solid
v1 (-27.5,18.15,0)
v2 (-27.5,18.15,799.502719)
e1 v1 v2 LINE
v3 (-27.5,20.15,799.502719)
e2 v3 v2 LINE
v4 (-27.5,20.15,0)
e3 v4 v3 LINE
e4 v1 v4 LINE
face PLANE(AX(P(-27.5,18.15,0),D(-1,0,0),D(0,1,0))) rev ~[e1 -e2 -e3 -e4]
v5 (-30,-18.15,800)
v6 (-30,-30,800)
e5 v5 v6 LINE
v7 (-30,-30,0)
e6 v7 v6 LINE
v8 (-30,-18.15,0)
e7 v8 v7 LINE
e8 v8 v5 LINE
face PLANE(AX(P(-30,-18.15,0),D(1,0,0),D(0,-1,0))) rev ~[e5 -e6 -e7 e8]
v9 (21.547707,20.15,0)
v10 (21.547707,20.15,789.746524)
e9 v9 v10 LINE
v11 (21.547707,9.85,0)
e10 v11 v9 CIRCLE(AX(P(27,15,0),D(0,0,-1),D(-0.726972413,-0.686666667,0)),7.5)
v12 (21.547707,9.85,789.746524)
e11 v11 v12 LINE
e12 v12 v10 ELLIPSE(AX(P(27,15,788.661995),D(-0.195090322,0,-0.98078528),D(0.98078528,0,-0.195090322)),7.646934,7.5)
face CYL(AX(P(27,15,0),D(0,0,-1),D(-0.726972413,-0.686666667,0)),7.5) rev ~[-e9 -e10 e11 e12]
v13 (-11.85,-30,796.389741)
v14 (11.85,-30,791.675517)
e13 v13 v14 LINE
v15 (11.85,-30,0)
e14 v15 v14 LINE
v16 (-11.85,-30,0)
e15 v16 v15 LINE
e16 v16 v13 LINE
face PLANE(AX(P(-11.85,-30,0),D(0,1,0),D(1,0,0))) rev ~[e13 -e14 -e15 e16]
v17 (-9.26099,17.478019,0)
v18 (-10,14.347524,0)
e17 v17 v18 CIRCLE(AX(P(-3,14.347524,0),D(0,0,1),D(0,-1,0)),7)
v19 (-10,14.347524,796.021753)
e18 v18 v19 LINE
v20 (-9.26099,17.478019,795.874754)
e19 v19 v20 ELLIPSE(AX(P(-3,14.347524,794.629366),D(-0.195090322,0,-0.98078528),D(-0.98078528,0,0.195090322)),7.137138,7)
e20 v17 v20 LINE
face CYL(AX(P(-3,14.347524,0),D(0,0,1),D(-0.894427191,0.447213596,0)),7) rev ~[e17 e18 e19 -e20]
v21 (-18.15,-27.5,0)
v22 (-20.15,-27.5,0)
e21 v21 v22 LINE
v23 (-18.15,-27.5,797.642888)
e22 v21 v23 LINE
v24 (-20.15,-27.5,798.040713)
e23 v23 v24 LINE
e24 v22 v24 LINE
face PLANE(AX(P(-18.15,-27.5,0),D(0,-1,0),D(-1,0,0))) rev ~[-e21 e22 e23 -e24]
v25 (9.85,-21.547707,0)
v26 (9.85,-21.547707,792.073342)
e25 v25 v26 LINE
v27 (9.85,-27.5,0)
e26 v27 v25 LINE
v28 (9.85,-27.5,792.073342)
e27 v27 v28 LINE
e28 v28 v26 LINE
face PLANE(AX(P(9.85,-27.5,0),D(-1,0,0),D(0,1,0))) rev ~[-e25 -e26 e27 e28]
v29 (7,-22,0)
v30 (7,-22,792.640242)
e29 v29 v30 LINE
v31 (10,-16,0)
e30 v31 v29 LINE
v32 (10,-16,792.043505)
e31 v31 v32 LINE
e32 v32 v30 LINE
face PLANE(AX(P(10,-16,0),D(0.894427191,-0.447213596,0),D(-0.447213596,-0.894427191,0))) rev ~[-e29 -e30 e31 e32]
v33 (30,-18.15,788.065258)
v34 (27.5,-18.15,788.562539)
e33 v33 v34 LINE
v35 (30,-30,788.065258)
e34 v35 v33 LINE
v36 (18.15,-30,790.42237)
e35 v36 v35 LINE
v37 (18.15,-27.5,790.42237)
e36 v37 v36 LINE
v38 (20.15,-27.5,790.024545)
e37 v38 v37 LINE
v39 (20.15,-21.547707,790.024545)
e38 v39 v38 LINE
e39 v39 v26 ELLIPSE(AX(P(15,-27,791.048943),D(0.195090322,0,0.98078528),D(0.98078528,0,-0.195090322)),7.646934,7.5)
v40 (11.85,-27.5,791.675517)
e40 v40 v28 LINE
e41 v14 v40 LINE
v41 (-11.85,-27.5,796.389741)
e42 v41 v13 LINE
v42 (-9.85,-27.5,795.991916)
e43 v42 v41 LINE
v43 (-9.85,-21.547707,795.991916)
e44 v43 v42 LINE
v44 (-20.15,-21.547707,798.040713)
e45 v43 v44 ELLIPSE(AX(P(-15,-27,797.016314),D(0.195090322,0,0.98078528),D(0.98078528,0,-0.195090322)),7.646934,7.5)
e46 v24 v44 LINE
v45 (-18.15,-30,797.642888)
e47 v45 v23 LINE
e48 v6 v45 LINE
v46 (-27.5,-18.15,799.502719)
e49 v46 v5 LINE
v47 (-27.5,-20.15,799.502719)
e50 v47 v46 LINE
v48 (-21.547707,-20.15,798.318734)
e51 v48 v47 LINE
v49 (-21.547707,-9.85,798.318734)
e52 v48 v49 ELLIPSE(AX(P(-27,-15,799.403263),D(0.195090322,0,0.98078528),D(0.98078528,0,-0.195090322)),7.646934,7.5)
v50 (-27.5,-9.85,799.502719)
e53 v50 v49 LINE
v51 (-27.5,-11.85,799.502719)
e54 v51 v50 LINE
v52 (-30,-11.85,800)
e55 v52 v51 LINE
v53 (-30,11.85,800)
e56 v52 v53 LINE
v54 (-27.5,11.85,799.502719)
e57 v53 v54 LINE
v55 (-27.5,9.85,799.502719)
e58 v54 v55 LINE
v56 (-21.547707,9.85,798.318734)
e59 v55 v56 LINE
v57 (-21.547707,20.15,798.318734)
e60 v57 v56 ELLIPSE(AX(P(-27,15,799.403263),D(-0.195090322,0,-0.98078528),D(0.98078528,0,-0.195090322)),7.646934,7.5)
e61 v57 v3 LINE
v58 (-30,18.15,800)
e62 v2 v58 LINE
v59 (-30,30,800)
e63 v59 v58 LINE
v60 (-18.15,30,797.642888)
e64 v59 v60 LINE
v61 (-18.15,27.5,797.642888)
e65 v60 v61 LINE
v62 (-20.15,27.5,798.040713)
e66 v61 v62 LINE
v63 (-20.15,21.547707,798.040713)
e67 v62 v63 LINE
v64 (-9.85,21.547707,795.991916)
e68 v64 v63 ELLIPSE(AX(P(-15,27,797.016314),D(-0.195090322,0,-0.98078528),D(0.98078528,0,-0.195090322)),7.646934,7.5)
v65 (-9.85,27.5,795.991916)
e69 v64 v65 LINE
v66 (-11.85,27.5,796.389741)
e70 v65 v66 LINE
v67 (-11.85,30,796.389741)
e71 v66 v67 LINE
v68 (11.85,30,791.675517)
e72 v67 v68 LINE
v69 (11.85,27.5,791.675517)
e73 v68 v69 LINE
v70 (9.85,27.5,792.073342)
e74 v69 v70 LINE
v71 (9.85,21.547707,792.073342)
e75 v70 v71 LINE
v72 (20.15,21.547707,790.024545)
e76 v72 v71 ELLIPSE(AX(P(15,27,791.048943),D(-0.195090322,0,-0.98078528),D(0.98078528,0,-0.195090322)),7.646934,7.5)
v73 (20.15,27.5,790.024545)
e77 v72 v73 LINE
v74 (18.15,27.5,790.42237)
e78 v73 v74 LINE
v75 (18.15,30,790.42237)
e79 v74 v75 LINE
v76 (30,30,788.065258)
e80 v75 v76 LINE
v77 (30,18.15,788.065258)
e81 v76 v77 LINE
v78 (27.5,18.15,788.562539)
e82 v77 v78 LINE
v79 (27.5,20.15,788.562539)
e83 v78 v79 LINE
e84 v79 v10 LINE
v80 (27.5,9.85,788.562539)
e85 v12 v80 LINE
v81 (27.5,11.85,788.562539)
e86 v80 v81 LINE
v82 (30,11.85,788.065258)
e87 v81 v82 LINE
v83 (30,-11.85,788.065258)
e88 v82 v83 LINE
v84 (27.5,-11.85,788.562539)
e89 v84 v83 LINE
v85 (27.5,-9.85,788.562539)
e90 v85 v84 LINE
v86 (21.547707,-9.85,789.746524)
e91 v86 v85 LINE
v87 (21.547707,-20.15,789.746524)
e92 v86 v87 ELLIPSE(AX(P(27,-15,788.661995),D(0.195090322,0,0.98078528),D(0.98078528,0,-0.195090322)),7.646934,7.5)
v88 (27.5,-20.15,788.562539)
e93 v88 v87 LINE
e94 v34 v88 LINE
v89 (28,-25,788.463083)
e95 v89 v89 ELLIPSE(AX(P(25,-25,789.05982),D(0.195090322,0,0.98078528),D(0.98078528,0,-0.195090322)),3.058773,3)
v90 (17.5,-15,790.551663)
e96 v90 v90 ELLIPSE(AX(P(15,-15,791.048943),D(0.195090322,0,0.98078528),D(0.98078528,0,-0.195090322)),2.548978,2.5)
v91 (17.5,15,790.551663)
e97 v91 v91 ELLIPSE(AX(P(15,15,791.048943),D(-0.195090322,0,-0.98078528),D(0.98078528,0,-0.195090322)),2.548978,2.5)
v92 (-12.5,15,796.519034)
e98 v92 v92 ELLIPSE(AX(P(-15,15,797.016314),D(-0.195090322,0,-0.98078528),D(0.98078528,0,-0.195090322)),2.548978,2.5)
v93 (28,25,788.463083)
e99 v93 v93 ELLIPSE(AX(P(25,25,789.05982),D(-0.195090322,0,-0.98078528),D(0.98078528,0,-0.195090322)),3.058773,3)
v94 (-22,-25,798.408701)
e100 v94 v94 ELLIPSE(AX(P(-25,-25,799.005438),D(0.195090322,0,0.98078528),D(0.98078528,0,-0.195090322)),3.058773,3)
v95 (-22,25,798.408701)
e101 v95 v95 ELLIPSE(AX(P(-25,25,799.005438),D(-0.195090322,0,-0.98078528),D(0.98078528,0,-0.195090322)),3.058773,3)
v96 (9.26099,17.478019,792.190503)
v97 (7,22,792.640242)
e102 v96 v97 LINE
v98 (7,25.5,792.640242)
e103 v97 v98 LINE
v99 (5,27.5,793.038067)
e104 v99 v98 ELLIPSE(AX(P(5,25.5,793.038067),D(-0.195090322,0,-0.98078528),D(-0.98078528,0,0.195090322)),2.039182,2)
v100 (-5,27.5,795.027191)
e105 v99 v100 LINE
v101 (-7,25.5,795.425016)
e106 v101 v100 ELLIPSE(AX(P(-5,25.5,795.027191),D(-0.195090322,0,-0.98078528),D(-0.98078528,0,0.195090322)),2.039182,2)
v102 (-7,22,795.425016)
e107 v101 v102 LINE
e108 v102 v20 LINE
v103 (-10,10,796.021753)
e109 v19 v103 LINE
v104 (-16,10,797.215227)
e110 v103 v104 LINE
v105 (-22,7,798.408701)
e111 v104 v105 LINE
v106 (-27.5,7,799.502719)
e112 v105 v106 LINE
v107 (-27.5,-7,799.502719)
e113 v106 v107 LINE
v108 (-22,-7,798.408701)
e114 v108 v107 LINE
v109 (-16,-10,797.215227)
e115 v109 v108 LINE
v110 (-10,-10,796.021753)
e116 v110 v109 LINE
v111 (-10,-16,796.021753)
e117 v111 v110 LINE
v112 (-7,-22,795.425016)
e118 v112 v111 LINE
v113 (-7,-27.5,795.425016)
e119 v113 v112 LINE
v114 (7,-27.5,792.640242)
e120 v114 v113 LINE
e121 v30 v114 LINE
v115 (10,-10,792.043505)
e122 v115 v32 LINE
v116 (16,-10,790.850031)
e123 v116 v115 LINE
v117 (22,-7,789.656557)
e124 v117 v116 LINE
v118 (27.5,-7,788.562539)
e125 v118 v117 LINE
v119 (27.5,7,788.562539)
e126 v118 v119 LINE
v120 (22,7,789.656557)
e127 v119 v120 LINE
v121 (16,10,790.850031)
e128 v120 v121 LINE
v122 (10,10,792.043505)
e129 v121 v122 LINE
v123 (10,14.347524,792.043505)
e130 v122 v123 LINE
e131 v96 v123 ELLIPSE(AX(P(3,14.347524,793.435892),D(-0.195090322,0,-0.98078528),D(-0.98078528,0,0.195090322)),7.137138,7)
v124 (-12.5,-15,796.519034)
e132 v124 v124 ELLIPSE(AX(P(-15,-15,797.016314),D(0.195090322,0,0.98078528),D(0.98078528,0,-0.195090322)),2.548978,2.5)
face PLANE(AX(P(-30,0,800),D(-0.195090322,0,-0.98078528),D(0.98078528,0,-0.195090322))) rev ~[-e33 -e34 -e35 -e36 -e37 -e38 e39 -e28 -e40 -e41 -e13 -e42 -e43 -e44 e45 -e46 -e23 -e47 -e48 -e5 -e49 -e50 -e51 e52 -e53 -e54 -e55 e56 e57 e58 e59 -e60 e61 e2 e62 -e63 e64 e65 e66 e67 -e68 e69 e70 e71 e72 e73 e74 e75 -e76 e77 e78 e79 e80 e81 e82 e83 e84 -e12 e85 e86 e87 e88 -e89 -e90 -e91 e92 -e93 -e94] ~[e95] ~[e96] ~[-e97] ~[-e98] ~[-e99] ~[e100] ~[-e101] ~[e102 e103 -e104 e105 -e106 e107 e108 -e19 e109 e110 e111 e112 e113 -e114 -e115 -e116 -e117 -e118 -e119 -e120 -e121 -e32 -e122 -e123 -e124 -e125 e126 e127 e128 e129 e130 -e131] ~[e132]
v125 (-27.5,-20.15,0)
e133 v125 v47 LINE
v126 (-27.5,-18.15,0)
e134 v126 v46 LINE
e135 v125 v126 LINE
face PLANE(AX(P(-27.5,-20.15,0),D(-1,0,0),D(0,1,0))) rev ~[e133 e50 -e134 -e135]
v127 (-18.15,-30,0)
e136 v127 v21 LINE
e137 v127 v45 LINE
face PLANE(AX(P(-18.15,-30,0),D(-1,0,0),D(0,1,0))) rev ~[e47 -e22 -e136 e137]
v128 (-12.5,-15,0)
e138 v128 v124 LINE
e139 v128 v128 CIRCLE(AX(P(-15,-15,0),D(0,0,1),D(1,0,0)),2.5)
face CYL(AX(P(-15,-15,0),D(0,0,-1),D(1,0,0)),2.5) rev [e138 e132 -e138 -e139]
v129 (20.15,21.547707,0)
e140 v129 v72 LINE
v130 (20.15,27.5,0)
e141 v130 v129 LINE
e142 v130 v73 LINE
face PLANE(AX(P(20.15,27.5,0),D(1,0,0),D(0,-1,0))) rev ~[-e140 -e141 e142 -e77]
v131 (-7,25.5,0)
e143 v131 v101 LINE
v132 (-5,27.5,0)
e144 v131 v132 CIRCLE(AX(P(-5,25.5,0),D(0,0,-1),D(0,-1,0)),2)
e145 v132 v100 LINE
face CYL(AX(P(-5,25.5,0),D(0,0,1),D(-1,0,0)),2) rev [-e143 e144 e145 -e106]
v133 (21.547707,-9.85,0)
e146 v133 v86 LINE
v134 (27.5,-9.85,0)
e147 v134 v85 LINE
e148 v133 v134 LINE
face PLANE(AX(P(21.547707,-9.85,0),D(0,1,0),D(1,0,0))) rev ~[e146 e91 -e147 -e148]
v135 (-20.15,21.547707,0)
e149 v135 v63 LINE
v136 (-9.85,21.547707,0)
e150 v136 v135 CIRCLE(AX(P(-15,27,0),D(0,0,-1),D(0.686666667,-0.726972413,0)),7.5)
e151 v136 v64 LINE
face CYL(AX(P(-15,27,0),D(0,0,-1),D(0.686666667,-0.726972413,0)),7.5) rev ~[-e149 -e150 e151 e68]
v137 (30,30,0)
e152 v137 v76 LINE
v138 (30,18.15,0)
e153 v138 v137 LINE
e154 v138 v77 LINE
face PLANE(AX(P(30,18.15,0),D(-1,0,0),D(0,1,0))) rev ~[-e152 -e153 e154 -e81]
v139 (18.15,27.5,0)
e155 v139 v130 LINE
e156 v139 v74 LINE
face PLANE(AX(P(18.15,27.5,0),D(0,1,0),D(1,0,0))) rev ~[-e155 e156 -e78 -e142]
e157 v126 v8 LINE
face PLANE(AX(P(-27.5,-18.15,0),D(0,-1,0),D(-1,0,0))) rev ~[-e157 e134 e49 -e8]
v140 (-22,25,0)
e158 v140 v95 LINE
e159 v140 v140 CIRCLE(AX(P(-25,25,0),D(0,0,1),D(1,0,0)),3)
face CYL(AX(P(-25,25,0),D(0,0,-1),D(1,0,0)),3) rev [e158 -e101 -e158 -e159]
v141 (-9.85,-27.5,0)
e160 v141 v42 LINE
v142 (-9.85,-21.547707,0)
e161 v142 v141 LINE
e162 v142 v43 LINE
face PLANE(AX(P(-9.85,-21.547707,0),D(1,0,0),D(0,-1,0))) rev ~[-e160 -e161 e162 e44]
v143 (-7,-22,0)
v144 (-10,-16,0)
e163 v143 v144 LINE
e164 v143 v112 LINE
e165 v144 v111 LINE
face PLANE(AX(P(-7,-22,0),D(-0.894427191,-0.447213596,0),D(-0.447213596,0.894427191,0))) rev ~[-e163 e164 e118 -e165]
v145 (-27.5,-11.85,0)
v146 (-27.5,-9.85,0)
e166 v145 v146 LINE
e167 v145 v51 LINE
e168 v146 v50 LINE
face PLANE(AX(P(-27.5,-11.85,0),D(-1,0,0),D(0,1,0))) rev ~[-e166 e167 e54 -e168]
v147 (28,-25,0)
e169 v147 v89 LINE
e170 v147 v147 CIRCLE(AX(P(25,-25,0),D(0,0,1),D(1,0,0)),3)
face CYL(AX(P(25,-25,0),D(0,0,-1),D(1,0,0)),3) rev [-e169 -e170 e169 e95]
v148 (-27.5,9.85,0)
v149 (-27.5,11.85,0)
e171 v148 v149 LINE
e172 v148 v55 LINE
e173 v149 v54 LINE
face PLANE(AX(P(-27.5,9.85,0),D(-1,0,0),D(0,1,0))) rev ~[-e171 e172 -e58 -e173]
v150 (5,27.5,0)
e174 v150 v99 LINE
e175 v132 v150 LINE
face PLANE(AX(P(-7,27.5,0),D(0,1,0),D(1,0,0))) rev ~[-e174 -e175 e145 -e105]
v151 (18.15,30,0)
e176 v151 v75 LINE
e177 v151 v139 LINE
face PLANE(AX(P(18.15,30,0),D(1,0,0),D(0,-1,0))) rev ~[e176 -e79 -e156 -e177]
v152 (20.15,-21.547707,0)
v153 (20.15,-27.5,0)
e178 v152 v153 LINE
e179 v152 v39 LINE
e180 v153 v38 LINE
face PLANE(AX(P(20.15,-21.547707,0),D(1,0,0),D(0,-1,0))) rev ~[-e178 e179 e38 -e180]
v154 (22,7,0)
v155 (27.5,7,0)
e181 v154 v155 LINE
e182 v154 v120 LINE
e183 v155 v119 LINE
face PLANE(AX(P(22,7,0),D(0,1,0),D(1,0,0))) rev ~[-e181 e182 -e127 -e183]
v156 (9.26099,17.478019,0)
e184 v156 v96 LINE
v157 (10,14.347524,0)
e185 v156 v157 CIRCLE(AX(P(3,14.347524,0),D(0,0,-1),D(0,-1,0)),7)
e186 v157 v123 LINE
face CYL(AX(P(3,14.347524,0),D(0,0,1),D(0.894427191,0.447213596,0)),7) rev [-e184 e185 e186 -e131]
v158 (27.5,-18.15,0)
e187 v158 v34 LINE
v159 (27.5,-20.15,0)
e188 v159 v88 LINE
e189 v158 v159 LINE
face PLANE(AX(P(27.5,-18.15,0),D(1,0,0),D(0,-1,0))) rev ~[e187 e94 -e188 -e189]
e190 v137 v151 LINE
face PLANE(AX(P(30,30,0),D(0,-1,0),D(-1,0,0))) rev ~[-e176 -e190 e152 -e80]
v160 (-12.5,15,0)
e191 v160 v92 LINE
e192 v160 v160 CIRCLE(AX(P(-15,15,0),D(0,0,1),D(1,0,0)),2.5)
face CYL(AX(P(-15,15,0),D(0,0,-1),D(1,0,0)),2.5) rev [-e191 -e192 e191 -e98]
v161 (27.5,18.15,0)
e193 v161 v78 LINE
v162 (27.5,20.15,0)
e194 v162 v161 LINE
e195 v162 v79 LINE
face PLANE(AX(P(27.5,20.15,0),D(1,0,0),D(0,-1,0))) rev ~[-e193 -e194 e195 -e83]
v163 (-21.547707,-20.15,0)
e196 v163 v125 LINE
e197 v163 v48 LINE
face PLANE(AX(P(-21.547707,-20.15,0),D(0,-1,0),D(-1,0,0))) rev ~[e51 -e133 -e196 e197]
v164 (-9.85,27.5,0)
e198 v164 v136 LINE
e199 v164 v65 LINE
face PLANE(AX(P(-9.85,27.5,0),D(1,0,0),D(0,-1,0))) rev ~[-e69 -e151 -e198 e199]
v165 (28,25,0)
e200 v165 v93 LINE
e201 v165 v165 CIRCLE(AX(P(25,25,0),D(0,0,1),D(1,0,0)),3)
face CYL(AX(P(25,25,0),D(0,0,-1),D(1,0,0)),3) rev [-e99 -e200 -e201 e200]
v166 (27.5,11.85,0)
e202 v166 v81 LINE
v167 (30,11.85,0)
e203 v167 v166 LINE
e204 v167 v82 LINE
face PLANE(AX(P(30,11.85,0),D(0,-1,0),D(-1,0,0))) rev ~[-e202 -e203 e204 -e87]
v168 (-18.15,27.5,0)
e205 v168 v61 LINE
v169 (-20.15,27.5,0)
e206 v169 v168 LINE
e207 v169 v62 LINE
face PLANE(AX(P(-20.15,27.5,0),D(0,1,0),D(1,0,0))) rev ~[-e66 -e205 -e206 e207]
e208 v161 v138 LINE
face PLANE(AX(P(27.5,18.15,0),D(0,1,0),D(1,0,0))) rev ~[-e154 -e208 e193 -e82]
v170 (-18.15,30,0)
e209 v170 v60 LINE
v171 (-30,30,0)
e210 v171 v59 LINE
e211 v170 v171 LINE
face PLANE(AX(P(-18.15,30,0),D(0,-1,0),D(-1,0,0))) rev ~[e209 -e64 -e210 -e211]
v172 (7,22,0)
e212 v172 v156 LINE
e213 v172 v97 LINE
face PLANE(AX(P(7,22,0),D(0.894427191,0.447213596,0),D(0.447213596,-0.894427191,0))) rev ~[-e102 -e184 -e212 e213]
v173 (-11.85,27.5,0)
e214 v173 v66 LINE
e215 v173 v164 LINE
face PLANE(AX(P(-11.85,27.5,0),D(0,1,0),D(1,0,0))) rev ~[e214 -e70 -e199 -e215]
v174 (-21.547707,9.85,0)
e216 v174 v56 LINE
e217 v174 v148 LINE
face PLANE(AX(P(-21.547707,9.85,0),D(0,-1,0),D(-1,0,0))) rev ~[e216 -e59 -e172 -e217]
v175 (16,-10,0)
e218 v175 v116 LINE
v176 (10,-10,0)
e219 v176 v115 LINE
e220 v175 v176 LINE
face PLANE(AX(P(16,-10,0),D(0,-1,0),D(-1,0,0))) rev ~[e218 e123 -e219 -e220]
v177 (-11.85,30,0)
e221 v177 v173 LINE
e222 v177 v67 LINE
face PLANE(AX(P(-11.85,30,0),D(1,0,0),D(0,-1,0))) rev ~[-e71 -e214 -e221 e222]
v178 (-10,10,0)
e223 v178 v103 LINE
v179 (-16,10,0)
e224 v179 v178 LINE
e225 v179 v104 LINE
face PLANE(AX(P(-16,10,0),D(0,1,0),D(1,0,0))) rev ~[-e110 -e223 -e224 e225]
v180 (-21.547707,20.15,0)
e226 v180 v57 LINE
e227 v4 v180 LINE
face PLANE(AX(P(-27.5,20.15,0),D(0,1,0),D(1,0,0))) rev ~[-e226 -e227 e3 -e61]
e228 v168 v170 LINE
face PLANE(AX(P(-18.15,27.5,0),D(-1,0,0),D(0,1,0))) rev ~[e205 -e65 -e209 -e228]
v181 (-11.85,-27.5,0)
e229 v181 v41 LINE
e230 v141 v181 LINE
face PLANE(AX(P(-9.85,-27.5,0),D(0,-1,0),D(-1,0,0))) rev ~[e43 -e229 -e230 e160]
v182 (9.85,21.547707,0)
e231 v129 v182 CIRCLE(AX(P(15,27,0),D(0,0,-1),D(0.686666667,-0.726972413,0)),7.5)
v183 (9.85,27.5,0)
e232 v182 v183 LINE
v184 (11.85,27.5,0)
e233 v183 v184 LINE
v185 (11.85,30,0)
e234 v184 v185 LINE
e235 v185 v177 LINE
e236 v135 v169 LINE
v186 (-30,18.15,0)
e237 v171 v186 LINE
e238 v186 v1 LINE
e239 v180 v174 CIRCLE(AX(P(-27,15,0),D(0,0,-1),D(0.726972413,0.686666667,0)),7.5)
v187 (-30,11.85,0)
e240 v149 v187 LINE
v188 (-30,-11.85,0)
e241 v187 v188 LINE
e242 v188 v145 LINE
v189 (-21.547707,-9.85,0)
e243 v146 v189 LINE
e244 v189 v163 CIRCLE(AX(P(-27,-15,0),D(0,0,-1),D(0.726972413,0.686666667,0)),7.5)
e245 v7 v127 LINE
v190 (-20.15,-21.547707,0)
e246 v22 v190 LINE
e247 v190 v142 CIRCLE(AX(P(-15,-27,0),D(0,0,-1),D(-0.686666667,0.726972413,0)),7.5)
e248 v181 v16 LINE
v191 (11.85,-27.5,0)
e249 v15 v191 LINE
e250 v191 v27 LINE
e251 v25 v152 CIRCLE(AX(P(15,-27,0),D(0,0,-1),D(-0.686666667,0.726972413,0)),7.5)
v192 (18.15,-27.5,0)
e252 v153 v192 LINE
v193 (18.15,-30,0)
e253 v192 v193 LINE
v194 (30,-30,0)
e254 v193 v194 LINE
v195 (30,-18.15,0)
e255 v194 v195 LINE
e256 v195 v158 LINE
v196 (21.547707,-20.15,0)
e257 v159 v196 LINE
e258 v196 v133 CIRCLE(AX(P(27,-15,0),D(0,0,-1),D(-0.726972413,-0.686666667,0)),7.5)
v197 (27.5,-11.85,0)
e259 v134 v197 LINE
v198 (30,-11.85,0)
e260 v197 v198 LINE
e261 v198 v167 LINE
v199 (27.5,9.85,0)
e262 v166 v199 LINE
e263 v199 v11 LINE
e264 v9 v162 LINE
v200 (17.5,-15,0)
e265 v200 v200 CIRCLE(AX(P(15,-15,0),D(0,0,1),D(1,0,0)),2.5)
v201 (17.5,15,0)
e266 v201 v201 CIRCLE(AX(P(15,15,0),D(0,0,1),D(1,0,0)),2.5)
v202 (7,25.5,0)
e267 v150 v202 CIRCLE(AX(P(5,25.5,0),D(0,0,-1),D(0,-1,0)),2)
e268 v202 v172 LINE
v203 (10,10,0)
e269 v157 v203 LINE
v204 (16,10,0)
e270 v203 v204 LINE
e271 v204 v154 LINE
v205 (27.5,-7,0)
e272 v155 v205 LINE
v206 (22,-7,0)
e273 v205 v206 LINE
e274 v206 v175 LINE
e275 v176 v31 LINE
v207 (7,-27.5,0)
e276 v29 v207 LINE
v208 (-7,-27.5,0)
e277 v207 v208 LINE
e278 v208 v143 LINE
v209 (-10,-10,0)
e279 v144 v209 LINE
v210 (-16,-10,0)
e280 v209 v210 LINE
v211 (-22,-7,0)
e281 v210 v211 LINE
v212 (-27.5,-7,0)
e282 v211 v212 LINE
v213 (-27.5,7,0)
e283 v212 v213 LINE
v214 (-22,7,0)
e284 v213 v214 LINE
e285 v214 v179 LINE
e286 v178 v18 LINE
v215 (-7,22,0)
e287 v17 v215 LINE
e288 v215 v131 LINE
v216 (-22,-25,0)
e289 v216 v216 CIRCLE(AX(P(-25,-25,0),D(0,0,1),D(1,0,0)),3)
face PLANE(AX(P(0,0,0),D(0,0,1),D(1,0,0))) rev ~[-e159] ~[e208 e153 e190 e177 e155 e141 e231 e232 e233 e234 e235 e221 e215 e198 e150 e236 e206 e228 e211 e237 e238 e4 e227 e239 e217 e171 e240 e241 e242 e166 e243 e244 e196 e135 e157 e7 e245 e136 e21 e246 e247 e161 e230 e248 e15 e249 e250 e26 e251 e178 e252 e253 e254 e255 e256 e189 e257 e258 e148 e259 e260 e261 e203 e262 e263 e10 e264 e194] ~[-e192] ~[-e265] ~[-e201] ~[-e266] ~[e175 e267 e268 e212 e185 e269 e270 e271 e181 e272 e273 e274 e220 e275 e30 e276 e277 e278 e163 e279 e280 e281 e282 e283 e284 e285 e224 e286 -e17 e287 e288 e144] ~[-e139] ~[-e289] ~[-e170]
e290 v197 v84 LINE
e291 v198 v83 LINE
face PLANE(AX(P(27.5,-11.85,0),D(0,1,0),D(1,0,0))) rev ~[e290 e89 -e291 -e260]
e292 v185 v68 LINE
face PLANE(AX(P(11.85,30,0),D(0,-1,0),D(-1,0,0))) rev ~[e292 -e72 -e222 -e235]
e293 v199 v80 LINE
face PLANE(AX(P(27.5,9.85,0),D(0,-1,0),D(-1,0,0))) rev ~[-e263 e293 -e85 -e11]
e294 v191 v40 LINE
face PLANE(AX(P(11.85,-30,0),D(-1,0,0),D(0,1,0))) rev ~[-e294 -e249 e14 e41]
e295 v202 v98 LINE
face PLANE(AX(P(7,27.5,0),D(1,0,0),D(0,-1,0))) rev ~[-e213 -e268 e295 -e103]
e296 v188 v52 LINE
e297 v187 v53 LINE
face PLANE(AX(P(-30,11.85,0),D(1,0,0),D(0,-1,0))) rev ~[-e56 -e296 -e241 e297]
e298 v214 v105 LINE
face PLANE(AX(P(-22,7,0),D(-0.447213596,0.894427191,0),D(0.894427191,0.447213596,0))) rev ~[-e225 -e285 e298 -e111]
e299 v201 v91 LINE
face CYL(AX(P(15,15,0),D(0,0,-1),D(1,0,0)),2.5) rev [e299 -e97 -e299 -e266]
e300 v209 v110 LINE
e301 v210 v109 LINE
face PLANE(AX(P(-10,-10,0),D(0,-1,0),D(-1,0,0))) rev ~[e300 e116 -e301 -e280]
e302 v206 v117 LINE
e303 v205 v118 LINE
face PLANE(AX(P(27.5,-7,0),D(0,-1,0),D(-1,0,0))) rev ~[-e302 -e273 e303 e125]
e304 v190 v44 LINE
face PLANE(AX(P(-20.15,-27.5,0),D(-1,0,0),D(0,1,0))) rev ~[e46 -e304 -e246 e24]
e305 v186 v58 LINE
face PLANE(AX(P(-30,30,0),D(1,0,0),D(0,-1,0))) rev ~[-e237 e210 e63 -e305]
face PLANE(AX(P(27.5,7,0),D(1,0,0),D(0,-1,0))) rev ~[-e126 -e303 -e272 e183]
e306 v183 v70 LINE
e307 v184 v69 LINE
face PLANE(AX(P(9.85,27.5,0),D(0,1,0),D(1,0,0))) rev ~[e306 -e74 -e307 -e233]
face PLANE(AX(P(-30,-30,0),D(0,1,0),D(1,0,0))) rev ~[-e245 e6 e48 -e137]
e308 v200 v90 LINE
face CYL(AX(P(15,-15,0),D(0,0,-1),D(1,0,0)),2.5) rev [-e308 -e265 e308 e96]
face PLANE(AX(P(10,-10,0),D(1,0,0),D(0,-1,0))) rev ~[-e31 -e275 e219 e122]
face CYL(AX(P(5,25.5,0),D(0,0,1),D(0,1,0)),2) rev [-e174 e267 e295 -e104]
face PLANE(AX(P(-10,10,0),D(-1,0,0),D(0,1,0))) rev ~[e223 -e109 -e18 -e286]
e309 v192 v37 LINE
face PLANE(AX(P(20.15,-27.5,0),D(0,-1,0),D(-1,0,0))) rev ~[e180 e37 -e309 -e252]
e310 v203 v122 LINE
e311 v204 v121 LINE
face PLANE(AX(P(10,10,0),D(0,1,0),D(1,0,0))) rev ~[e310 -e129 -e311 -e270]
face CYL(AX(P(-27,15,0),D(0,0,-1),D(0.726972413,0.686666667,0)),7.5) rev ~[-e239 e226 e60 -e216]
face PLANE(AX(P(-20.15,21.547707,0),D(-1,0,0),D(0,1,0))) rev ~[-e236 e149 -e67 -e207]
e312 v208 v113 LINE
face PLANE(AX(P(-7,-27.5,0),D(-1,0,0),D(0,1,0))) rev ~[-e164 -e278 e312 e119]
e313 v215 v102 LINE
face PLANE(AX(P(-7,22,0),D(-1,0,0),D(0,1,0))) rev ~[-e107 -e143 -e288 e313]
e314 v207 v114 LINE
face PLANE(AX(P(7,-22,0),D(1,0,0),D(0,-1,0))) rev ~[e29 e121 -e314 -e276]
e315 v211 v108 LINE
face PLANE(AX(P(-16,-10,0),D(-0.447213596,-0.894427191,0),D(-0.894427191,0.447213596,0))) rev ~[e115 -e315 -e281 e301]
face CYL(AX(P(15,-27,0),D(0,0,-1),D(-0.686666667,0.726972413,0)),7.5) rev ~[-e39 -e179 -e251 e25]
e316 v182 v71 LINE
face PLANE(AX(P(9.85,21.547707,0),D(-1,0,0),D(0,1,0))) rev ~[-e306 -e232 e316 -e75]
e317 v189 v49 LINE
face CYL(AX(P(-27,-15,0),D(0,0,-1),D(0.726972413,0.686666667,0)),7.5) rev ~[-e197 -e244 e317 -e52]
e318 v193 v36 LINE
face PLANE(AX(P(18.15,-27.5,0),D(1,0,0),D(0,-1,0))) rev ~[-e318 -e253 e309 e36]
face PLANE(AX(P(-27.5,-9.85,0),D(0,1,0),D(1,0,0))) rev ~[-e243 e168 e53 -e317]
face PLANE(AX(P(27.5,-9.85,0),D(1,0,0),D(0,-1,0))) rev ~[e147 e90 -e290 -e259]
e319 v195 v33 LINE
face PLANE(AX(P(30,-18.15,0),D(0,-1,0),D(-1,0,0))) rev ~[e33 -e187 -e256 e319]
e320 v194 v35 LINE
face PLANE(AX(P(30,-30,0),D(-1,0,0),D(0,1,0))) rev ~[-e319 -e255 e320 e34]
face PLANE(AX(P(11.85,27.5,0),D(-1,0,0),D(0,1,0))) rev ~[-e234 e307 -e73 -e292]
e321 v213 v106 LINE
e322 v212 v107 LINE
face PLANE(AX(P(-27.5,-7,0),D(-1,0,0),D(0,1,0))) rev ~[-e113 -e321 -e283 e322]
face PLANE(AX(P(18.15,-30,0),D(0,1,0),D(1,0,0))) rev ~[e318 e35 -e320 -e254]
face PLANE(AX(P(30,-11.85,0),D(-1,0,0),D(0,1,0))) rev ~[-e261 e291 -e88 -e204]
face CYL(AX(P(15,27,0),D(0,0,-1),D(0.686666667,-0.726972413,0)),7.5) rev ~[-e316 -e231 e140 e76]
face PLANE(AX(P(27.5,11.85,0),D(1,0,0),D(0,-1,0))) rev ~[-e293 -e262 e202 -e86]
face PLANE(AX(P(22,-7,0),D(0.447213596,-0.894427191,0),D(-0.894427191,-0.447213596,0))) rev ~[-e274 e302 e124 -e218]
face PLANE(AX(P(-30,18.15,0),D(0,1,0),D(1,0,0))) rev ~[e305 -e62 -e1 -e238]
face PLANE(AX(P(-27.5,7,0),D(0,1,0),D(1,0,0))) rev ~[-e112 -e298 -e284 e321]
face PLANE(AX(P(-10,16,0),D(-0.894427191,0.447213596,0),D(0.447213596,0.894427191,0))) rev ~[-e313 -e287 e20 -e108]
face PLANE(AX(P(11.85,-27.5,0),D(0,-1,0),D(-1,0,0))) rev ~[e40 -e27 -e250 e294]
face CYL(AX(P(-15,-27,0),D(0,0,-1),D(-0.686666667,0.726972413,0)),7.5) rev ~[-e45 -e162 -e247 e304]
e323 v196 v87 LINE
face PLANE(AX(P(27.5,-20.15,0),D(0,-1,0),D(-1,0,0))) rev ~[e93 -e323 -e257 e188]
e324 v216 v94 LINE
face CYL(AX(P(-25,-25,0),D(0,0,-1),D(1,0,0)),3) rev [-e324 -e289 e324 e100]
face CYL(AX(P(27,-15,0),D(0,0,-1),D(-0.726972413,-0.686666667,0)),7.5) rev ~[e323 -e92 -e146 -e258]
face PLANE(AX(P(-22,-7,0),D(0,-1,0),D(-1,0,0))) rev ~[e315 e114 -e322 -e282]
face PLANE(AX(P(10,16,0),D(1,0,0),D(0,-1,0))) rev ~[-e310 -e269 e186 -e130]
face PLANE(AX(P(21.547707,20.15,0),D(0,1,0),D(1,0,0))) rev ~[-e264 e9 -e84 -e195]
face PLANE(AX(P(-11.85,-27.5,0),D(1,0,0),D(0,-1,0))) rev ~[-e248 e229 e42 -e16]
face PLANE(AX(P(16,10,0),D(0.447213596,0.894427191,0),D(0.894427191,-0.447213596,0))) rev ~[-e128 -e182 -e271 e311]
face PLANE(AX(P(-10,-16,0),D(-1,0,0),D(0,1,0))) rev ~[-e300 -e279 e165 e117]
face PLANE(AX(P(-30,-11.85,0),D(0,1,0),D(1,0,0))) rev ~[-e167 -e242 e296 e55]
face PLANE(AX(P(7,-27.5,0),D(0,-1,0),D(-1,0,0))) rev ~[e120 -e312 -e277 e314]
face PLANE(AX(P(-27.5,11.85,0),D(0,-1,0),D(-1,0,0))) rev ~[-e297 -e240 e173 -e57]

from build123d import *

# Parameters (mm, degrees)
F0_R          = 3
F0_R_2        = 2.5
F1_DEPTH      = 800
F2_R          = 2
F3_R          = 7
F6_DEPTH      = 30
F6_DEPTH_BACK = 30


# Not quite as in the source:
# - a feature names something its author has since deleted; it is built from what else it names


with BuildPart() as f1:
    # F0 (on Top) → F1 (new body)
    with BuildSketch(Plane.XY):
        with BuildLine():
            Line((18.15, -30), (30, -30))
            Line((30, -30), (30, -18.15))
            Line((30, -18.15), (27.5, -18.15))
            Line((27.5, -18.15), (27.5, -20.15))
            Line((27.5, -20.15), (21.5477069044, -20.15))
            ThreePointArc((21.5477069044, -20.15), (19.5, -15), (21.5477069044, -9.85))
            Line((21.5477069044, -9.85), (27.5, -9.85))
            Line((27.5, -9.85), (27.5, -11.85))
            Line((27.5, -11.85), (30, -11.85))
            Line((30, -11.85), (30, 11.85))
            Line((30, 11.85), (27.5, 11.85))
            Line((27.5, 11.85), (27.5, 9.85))
            Line((27.5, 9.85), (21.5477069044, 9.85))
            ThreePointArc((21.5477069044, 9.85), (19.5, 15), (21.5477069044, 20.15))
            Line((21.5477069044, 20.15), (27.5, 20.15))
            Line((27.5, 20.15), (27.5, 18.15))
            Line((27.5, 18.15), (30, 18.15))
            Line((30, 18.15), (30, 30))
            Line((30, 30), (18.15, 30))
            Line((18.15, 30), (18.15, 27.5))
            Line((18.15, 27.5), (20.15, 27.5))
            Line((20.15, 27.5), (20.15, 21.5477069044))
            ThreePointArc((20.15, 21.5477069044), (15, 19.5), (9.85, 21.5477069044))
            Line((9.85, 21.5477069044), (9.85, 27.5))
            Line((9.85, 27.5), (11.85, 27.5))
            Line((11.85, 27.5), (11.85, 30))
            Line((11.85, 30), (-11.85, 30))
            Line((-11.85, 30), (-11.85, 27.5))
            Line((-11.85, 27.5), (-9.85, 27.5))
            Line((-9.85, 27.5), (-9.85, 21.5477069044))
            ThreePointArc((-9.85, 21.5477069044), (-15, 19.5), (-20.15, 21.5477069044))
            Line((-20.15, 21.5477069044), (-20.15, 27.5))
            Line((-20.15, 27.5), (-18.15, 27.5))
            Line((-18.15, 27.5), (-18.15, 30))
            Line((-18.15, 30), (-30, 30))
            Line((-30, 30), (-30, 18.15))
            Line((-30, 18.15), (-27.5, 18.15))
            Line((-27.5, 18.15), (-27.5, 20.15))
            Line((-27.5, 20.15), (-21.5477069044, 20.15))
            ThreePointArc((-21.5477069044, 20.15), (-19.5, 15), (-21.5477069044, 9.85))
            Line((-21.5477069044, 9.85), (-27.5, 9.85))
            Line((-27.5, 9.85), (-27.5, 11.85))
            Line((-27.5, 11.85), (-30, 11.85))
            Line((-30, 11.85), (-30, -11.85))
            Line((-30, -11.85), (-27.5, -11.85))
            Line((-27.5, -11.85), (-27.5, -9.85))
            Line((-27.5, -9.85), (-21.5477069044, -9.85))
            ThreePointArc((-21.5477069044, -9.85), (-19.5, -15), (-21.5477069044, -20.15))
            Line((-21.5477069044, -20.15), (-27.5, -20.15))
            Line((-27.5, -20.15), (-27.5, -18.15))
            Line((-27.5, -18.15), (-30, -18.15))
            Line((-30, -18.15), (-30, -30))
            Line((-30, -30), (-18.15, -30))
            Line((-18.15, -30), (-18.15, -27.5))
            Line((-18.15, -27.5), (-20.15, -27.5))
            Line((-20.15, -27.5), (-20.15, -21.5477069044))
            ThreePointArc((-20.15, -21.5477069044), (-15, -19.5), (-9.85, -21.5477069044))
            Line((-9.85, -21.5477069044), (-9.85, -27.5))
            Line((-9.85, -27.5), (-11.85, -27.5))
            Line((-11.85, -27.5), (-11.85, -30))
            Line((-11.85, -30), (11.85, -30))
            Line((11.85, -30), (11.85, -27.5))
            Line((11.85, -27.5), (9.85, -27.5))
            Line((9.85, -27.5), (9.85, -21.5477069044))
            ThreePointArc((9.85, -21.5477069044), (15, -19.5), (20.15, -21.5477069044))
            Line((20.15, -21.5477069044), (20.15, -27.5))
            Line((20.15, -27.5), (18.15, -27.5))
            Line((18.15, -27.5), (18.15, -30))
        make_face()
        with Locations((-25, -25)):
            Circle(F0_R, mode=Mode.SUBTRACT)
        with Locations((-15, -15)):
            Circle(F0_R_2, mode=Mode.SUBTRACT)
        with Locations((25, -25)):
            Circle(F0_R, mode=Mode.SUBTRACT)
        with Locations((15, -15)):
            Circle(F0_R_2, mode=Mode.SUBTRACT)
        with Locations((-25, 25)):
            Circle(F0_R, mode=Mode.SUBTRACT)
        with Locations((-15, 15)):
            Circle(F0_R_2, mode=Mode.SUBTRACT)
        Polygon((-7, 22), (-7, 27.5), (0, 27.5), (7, 27.5), (7, 22), (10, 16), (10, 10), (16, 10), (22, 7), (27.5, 7), (27.5, 0), (27.5, -7), (22, -7), (16, -10), (10, -10), (10, -16), (7, -22), (7, -27.5), (0, -27.5), (-7, -27.5), (-7, -22), (-10, -16), (-10, -10), (-16, -10), (-22, -7), (-27.5, -7), (-27.5, 0), (-27.5, 7), (-22, 7), (-16, 10), (-10, 10), (-10, 16), align=None, mode=Mode.SUBTRACT)
        with Locations((15, 15)):
            Circle(F0_R_2, mode=Mode.SUBTRACT)
        with Locations((25, 25)):
            Circle(F0_R, mode=Mode.SUBTRACT)
    extrude(amount=F1_DEPTH)

    # F2
    f2_edges = [f1.edges().sort_by_distance(p)[0] for p in [
        (-7, 27.5, 400),
        (7, 27.5, 400),
    ]]
    fillet(f2_edges, radius=F2_R)

    # F3
    f3_edges = [f1.edges().sort_by_distance(p)[0] for p in [
        (-10, 16, 400),
        (10, 16, 400),
    ]]
    fillet(f3_edges, radius=F3_R)

    # F5 (on Front) → F6 (cut, two sides)
    with BuildSketch(Plane.XZ) as f6_sk:
        Polygon((92.6955789172, 775.5943319306), (113.9419287111, 882.406945313), (-8.7536502061, 906.8126133825), (-30, 800), align=None)
    extrude(amount=F6_DEPTH, mode=Mode.SUBTRACT)
    extrude(f6_sk.sketch, amount=-F6_DEPTH_BACK, mode=Mode.SUBTRACT)


solid = f1.part
